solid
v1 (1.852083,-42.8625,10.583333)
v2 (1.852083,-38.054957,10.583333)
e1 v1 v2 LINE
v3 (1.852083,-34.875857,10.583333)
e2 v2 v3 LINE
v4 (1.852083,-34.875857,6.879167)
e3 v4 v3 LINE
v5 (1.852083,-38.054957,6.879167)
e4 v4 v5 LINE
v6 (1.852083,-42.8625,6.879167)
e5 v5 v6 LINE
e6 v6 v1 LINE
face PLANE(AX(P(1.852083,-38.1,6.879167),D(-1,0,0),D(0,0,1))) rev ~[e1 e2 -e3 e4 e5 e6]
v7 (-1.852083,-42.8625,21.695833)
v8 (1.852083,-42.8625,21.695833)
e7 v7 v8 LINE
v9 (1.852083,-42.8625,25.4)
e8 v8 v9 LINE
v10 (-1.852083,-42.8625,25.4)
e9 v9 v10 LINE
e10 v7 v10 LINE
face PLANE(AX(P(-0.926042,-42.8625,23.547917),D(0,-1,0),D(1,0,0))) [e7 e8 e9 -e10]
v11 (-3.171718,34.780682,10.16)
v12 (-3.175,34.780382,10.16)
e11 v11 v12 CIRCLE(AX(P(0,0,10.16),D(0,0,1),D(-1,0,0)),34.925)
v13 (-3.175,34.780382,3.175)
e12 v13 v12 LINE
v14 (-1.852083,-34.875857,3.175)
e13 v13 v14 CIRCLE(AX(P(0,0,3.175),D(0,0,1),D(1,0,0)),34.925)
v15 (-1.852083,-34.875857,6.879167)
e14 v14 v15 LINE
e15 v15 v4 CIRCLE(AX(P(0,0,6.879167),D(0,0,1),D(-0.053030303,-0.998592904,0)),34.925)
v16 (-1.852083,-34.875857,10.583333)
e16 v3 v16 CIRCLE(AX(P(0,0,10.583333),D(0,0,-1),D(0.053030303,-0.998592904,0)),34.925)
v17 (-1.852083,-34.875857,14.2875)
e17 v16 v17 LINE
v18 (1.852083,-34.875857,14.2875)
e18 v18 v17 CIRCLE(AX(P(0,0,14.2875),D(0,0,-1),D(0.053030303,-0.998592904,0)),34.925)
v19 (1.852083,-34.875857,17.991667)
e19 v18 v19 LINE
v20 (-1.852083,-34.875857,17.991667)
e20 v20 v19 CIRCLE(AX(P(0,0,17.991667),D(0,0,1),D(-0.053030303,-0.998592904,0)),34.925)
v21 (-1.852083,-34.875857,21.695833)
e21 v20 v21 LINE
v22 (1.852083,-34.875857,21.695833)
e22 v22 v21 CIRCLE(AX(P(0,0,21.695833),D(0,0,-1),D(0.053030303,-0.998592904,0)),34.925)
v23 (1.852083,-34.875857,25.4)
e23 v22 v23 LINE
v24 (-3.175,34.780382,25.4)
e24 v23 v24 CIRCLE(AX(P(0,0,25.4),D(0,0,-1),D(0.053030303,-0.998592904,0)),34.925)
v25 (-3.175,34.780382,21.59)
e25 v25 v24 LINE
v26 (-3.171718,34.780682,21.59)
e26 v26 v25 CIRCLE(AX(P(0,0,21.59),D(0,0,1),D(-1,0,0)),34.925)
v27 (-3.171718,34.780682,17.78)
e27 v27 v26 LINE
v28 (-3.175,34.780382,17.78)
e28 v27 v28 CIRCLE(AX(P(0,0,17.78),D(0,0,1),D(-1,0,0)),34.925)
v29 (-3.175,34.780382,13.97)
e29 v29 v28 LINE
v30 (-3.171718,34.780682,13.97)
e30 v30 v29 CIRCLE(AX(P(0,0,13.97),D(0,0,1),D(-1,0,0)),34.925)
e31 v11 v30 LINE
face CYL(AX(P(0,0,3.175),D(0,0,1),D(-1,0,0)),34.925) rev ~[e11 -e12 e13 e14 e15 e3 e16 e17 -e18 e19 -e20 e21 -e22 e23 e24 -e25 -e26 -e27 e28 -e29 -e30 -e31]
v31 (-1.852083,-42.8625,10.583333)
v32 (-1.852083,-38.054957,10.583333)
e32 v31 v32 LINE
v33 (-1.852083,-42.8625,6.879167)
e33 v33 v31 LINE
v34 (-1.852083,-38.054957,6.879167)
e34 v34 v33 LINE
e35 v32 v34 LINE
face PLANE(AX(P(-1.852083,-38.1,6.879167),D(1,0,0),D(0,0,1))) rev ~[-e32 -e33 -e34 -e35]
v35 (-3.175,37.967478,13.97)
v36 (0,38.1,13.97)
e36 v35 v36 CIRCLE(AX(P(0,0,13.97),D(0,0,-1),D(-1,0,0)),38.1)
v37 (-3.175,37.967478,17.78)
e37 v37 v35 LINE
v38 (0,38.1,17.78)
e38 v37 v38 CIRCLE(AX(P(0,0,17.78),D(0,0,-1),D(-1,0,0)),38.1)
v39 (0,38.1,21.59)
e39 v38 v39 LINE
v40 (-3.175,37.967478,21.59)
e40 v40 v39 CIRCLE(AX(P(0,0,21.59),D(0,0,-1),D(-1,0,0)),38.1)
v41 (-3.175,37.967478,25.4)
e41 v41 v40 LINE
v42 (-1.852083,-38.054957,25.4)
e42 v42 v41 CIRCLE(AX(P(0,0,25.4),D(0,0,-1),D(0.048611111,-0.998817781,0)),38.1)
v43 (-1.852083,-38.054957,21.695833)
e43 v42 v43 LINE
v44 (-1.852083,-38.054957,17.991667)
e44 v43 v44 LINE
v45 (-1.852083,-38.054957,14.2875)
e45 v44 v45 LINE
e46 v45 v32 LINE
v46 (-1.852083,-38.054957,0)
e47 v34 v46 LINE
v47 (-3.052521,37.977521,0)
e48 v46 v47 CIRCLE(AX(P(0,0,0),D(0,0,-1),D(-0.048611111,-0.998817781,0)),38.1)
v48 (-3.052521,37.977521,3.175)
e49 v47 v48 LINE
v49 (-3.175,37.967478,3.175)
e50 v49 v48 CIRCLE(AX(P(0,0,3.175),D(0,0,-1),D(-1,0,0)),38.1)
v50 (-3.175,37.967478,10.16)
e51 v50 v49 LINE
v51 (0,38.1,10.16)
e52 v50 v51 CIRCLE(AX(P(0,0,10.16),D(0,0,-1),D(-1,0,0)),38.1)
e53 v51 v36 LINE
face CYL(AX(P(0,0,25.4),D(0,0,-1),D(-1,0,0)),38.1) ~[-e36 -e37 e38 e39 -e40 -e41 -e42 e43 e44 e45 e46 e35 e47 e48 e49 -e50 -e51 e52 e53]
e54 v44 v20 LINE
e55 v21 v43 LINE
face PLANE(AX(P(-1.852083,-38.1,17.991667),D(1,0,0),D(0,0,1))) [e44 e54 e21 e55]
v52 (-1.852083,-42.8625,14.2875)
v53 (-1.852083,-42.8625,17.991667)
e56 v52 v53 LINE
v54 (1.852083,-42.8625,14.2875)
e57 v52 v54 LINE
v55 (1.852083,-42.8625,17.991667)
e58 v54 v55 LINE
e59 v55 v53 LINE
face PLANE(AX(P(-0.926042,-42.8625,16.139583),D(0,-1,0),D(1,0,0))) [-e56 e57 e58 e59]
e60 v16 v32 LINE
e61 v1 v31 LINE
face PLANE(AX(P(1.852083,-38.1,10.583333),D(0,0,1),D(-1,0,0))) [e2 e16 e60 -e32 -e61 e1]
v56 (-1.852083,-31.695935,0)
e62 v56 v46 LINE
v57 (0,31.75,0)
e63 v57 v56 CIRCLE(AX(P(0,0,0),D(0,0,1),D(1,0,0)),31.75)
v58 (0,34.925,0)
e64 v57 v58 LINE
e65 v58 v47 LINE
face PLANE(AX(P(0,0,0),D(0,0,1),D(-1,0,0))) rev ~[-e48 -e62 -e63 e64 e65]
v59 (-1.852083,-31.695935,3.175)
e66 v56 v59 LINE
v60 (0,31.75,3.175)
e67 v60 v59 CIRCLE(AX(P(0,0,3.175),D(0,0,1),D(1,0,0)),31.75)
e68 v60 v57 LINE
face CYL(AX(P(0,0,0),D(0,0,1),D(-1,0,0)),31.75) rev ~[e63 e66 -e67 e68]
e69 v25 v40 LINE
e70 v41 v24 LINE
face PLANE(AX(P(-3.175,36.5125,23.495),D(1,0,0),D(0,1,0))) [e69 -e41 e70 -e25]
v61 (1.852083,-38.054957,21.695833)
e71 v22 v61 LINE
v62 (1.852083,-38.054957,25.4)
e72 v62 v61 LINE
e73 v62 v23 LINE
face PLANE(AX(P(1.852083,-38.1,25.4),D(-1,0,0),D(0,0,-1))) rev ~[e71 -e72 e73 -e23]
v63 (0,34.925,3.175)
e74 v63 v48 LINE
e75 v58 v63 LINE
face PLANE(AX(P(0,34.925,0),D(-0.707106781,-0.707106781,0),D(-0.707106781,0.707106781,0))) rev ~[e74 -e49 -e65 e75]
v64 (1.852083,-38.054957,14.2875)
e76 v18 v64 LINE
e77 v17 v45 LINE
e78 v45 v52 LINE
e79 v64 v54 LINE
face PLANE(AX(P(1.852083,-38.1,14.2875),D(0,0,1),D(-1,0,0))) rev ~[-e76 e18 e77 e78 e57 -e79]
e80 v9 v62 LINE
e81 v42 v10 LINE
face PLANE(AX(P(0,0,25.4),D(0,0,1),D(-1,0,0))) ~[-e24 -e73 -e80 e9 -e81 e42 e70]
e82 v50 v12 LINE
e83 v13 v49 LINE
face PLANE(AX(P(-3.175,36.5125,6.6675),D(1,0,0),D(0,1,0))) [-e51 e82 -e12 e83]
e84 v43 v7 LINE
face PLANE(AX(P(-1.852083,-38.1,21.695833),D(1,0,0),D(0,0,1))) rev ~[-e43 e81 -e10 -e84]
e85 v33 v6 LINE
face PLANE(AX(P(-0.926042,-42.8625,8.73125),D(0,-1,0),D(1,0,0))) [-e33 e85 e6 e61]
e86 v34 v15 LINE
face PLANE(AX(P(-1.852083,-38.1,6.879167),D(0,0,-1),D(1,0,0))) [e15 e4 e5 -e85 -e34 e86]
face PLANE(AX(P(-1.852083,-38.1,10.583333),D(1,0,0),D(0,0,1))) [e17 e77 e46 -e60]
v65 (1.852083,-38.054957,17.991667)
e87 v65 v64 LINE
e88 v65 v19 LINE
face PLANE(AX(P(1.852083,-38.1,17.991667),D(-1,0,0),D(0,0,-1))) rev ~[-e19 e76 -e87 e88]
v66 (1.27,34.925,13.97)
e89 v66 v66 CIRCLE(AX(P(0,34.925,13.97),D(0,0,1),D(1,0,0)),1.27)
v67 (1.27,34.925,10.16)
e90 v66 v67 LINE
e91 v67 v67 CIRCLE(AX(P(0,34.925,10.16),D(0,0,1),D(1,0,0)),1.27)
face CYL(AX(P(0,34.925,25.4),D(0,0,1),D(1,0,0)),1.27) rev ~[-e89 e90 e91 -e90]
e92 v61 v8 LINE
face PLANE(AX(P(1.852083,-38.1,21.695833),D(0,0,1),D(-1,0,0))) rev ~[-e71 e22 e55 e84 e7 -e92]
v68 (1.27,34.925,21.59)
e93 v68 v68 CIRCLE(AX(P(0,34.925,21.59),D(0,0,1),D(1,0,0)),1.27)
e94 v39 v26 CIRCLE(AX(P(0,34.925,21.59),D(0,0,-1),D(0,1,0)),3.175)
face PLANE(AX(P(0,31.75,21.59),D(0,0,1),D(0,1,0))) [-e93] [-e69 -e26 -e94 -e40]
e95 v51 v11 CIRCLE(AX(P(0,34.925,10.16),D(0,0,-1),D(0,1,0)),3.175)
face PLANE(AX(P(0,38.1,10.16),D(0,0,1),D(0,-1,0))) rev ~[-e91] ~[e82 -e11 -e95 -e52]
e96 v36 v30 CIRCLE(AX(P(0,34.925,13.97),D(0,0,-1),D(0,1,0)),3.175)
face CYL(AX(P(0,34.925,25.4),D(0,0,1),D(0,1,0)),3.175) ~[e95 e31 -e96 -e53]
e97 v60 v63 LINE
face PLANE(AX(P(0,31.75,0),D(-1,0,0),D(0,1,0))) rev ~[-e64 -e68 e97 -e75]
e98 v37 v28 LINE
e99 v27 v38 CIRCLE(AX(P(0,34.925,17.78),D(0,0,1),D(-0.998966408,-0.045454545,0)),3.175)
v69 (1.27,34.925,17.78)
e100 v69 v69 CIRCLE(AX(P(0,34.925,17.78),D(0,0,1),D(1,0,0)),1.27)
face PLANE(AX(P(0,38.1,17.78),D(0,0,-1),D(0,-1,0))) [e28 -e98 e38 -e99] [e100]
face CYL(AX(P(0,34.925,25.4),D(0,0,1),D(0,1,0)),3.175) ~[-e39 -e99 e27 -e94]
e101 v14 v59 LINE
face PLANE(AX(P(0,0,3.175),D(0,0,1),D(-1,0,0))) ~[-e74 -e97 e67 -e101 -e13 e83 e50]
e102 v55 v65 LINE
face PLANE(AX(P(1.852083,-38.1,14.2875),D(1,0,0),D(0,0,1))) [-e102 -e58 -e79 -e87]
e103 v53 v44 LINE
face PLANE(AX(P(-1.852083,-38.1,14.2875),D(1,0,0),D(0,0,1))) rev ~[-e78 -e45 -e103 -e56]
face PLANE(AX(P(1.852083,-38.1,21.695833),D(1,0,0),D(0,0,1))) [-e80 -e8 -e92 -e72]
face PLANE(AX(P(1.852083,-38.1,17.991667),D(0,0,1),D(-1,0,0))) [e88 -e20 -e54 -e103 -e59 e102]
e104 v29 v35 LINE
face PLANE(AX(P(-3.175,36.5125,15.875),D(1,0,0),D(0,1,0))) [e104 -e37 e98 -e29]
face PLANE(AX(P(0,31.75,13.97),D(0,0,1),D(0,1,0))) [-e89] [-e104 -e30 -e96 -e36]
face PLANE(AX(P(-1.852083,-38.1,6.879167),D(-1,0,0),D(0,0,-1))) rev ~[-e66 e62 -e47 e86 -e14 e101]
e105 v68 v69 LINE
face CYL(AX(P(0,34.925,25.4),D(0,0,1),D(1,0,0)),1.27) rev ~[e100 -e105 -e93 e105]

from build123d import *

# Parameters (mm, degrees)
F3_W           = 1.8520833333
F3_H           = 3.7041666667
F3_H_2         = 3.175
F4_DEPTH       = 38.1
F6_DEPTH       = 25.401
F7_R           = 3.175
F8_DEPTH       = 15.24
F9_R           = 1.27
F10_DEPTH      = 22.225
F11_W          = 3.175
F11_H          = 3.81
F11_H_2        = 6.985
F12_DEPTH      = 3.175
F13_DEPTH      = 4.7625
F13_DEPTH_BACK = 3.175
F15_DEPTH      = 3.175


# Not quite as in the source:
# - a length typed as a fraction of an inch, garbled in the dataset ("3 / 203.2 mm" for 3/8 in), is restored
# - a feature names something its author has since deleted; it is built from what else it names


with BuildPart() as f1:
    # F0 (on Front) → F1 (revolve)
    with BuildSketch(Plane.XZ):
        Polygon((-38.1, 0), (-31.75, 0), (-31.75, 3.175), (-34.925, 3.175), (-34.925, 25.4), (-38.1, 25.4), align=None)
    revolve(axis=Axis((0, 0, 12.7), (0, 0, 1)))

    # F3 (on offset) → F4 (cut, symmetric)
    with BuildSketch(Plane.XZ.offset(38.1)):
        with Locations((-0.9260416667, 5.0270833333)):
            Rectangle(F3_W, F3_H)
        with Locations((0.9260416667, 5.0270833333)):
            Rectangle(F3_W, F3_H)
        with Locations((0.9260416667, 12.4354166667)):
            Rectangle(F3_W, F3_H)
        with Locations((-0.9260416667, 12.4354166667)):
            Rectangle(F3_W, F3_H)
        with Locations((-0.9260416667, 19.84375)):
            Rectangle(F3_W, F3_H)
        Polygon((1.8520833333, 3.175), (1.8520833333, 0), (50.8, 0), (50.8, 25.4), (1.8520833333, 25.4), (1.8520833333, 21.6958333333), (1.8520833333, 17.9916666667), (1.8520833333, 14.2875), (1.8520833333, 10.5833333333), (1.8520833333, 6.8791666667), align=None)
        with Locations((0.9260416667, 19.84375)):
            Rectangle(F3_W, F3_H)
        with Locations((0.9260416667, 1.5875)):
            Rectangle(F3_W, F3_H_2)
        with Locations((-0.9260416667, 1.5875)):
            Rectangle(F3_W, F3_H_2)
    extrude(amount=F4_DEPTH, both=True, mode=Mode.SUBTRACT)

    # F5 (on face) → F6 (cut, through all)
    with BuildSketch(Plane.XY.offset(25.4)):
        with BuildLine():
            ThreePointArc((0, 38.1), (3.175, 34.925), (0, 31.75))
            ThreePointArc((0, 31.75), (22.4506403027, 22.4506403027), (31.75, 0))
            Line((31.75, 0), (41.275, 0))
            ThreePointArc((41.275, 0), (27.0107441469, 31.2096992237), (-5.922835282, 40.847835282))
            Line((-5.922835282, 40.847835282), (-3.0525211735, 37.9775211735))
            ThreePointArc((-3.0525211735, 37.9775211735), (-1.5274886724, 38.0693679795), (0, 38.1))
        make_face()
    extrude(amount=-F6_DEPTH, mode=Mode.SUBTRACT)

    # F7 (on face) → F8 (join)
    with BuildSketch(Plane.XY.offset(25.4)):
        with Locations((0, 34.925)):
            Circle(F7_R)
    extrude(amount=-F8_DEPTH)

    # F9 (on face) → F10 (cut)
    with BuildSketch(Plane.XY.offset(25.4)):
        with Locations((0, 34.925)):
            Circle(F9_R)
    extrude(amount=-F10_DEPTH, mode=Mode.SUBTRACT)

    # F11 (on Right) → F12 (cut, symmetric)
    with BuildSketch(Plane.YZ):
        with Locations((36.5125, 23.495)):
            Rectangle(F11_W, F11_H)
        with Locations((33.3375, 23.495)):
            Rectangle(F11_W, F11_H)
        with Locations((36.5125, 15.875)):
            Rectangle(F11_W, F11_H)
        with Locations((36.5125, 6.6675)):
            Rectangle(F11_W, F11_H_2)
        with Locations((33.3375, 6.6675)):
            Rectangle(F11_W, F11_H_2)
        with Locations((33.3375, 15.875)):
            Rectangle(F11_W, F11_H)
    extrude(amount=F12_DEPTH, both=True, mode=Mode.SUBTRACT)

    # F3 (on offset) → F13 (join, two sides)
    with BuildSketch(Plane.XZ.offset(38.1)) as f13_sk:
        with Locations((-0.9260416667, 8.73125)):
            Rectangle(F3_W, F3_H)
        with Locations((0.9260416667, 8.73125)):
            Rectangle(F3_W, F3_H)
        with Locations((-0.9260416667, 16.1395833333)):
            Rectangle(F3_W, F3_H)
        with Locations((0.9260416667, 16.1395833333)):
            Rectangle(F3_W, F3_H)
        with Locations((-0.9260416667, 23.5479166667)):
            Rectangle(F3_W, F3_H)
        with Locations((0.9260416667, 23.5479166667)):
            Rectangle(F3_W, F3_H)
    extrude(amount=F13_DEPTH)
    extrude(f13_sk.sketch, amount=-F13_DEPTH_BACK)

    # F14 (on face) → F15 (cut)
    with BuildSketch(Plane(origin=(0, 0, 0), x_dir=(1, 0, 0), z_dir=(0, 0, -1))):
        with BuildLine():
            Line((0, -31.75), (0, -34.925))
            Line((0, -34.925), (-3.0525211735, -37.9775211735))
            ThreePointArc((-3.0525211735, -37.9775211735), (-1.5274886724, -38.0693679795), (0, -38.1))
            ThreePointArc((0, -38.1), (3.175, -34.925), (0, -31.75))
        make_face()
    extrude(amount=-F15_DEPTH, mode=Mode.SUBTRACT)


solid = f1.part
